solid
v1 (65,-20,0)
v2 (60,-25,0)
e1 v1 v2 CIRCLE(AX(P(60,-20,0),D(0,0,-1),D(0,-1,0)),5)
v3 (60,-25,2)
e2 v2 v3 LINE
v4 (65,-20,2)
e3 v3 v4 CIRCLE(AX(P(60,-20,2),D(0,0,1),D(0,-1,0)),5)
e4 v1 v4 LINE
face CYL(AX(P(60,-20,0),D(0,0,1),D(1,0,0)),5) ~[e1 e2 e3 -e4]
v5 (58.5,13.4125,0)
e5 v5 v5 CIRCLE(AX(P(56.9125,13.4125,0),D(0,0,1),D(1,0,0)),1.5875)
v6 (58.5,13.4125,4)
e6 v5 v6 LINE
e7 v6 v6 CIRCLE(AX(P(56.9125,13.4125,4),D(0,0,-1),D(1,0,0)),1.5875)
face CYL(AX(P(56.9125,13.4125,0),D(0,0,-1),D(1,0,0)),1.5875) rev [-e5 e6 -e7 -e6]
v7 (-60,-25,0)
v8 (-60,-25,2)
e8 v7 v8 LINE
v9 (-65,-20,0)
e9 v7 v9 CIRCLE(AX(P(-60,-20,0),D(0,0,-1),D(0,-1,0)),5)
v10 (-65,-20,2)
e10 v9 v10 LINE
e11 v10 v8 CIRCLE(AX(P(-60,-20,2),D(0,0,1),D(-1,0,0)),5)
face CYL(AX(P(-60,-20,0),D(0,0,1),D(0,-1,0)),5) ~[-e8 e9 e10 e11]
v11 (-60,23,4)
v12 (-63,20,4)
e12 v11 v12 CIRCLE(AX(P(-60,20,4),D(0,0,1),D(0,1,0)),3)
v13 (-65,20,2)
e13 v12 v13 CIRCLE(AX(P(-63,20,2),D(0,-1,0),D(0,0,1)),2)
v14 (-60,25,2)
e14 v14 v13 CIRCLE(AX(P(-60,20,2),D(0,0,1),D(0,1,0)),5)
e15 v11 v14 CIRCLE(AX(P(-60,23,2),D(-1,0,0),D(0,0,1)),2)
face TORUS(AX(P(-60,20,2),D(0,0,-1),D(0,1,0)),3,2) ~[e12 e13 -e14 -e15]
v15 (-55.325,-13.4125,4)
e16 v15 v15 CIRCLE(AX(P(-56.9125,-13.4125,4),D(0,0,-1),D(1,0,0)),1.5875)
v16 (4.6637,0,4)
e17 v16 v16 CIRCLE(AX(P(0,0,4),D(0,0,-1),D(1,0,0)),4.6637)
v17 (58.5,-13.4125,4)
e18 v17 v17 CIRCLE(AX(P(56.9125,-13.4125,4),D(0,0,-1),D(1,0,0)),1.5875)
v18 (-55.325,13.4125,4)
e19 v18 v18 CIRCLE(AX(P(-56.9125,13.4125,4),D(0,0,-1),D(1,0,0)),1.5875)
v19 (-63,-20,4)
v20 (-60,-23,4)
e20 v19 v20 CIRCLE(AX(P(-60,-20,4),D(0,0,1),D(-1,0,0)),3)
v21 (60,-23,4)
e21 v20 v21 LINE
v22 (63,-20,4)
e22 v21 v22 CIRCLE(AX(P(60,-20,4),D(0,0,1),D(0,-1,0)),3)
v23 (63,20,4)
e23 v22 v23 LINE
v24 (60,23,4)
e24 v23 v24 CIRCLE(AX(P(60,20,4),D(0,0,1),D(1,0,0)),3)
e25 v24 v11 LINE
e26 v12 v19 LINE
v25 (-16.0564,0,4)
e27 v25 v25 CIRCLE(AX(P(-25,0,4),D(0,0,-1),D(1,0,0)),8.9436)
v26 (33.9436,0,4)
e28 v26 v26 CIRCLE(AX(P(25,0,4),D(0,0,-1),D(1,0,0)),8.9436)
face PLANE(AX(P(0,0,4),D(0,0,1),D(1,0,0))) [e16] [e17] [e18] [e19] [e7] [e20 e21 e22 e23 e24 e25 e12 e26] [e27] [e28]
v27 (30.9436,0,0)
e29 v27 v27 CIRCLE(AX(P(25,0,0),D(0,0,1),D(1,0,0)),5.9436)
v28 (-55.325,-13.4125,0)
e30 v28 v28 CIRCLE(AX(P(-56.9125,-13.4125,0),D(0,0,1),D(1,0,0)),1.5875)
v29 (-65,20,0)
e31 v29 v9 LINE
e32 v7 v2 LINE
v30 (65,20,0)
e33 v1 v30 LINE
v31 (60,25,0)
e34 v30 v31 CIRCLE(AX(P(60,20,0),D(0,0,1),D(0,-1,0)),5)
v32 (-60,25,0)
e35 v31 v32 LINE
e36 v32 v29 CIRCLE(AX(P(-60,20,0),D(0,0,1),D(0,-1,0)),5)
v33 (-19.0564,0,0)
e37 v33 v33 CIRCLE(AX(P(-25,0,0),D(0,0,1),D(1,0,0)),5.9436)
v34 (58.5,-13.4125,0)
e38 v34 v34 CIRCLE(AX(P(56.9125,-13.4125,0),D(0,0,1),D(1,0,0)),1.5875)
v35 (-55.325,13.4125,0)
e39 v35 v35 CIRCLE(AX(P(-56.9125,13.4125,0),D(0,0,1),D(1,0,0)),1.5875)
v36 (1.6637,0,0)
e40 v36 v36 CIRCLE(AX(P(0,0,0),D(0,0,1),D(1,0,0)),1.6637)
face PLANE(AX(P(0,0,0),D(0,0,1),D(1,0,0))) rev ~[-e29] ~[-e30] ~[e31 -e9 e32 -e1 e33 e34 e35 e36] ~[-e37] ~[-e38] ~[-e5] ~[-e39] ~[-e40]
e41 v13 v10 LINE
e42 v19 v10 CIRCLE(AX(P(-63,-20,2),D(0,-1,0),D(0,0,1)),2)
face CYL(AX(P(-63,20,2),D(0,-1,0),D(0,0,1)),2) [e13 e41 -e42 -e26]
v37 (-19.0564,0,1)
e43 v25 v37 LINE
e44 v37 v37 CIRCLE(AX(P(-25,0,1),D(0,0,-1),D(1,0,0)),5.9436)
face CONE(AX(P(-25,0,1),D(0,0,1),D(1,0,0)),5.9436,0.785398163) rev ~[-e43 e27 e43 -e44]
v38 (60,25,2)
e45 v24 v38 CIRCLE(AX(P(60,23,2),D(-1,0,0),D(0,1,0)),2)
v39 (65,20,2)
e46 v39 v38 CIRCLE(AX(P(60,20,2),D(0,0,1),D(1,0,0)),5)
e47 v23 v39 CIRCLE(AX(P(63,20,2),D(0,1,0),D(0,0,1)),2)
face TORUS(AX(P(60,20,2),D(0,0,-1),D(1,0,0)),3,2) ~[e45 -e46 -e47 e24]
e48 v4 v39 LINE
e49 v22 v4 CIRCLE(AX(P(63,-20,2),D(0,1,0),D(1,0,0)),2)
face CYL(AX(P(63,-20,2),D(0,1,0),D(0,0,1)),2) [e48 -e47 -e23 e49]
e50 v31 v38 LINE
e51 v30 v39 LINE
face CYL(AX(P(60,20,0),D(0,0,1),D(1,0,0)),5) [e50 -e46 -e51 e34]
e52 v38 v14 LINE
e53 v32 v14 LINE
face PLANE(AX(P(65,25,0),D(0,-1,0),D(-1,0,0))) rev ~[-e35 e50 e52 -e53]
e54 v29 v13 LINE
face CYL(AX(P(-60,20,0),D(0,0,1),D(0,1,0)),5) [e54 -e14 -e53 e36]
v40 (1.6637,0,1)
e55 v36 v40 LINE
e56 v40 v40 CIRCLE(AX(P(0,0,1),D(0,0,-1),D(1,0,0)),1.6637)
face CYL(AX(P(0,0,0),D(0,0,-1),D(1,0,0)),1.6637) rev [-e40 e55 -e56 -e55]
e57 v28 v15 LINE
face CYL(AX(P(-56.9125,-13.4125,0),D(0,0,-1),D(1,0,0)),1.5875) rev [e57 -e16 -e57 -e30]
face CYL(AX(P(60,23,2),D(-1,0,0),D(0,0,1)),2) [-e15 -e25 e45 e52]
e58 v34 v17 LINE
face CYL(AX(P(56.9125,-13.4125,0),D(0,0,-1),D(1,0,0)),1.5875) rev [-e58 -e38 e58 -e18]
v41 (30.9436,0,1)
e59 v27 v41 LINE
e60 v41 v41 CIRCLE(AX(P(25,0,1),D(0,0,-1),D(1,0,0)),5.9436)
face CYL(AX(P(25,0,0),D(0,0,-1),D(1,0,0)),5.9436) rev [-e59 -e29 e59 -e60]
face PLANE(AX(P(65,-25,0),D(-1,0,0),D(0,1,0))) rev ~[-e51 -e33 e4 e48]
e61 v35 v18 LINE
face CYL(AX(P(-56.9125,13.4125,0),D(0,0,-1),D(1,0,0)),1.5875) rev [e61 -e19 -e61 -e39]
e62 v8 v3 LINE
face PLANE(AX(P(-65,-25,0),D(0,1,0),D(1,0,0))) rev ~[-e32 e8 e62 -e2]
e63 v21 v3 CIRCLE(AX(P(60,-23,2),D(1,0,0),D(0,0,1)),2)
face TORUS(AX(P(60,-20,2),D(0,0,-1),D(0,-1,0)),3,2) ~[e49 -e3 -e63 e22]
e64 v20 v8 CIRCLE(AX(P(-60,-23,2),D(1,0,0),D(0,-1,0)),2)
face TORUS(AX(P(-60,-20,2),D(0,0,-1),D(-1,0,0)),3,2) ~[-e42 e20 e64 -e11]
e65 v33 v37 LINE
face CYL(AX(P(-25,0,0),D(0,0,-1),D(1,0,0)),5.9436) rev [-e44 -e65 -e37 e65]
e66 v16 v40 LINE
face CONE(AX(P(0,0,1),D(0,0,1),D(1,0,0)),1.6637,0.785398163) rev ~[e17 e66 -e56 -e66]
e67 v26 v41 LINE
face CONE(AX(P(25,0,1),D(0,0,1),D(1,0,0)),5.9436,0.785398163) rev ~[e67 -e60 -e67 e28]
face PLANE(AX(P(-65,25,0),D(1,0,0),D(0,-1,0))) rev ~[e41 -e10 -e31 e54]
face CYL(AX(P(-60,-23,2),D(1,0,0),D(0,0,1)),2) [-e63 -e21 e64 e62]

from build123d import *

# Parameters (mm, degrees)
F1_DEPTH = 4
F2_R     = 5.9436
F2_R_2   = 1.6637
F2_R_3   = 1.5875
F3_DEPTH = 25
F4_R     = 5
F5_R     = 2
F6_SIZE  = 3
F7_SIZE  = 3


# Not quite as in the source:
# - a feature names something its author has since deleted; it is built from what else it names


with BuildPart() as f1:
    # F0 (on Top) → F1 (new body)
    with BuildSketch(Plane.XY):
        Polygon((65, -25), (65, 25), (33, 25), (-33, 25), (-65, 25), (-65, -25), align=None)
    extrude(amount=F1_DEPTH)

    # F2 (on Top) → F3 (cut)
    with BuildSketch(Plane.XY):
        with Locations((-25, 0)):
            Circle(F2_R)
        Circle(F2_R_2)
        with Locations((25, 0)):
            Circle(F2_R)
        with Locations((-56.9125, 13.4125)):
            Circle(F2_R_3)
        with Locations((-56.9125, -13.4125)):
            Circle(F2_R_3)
        with Locations((56.9125, 13.4125)):
            Circle(F2_R_3)
        with Locations((56.9125, -13.4125)):
            Circle(F2_R_3)
    extrude(amount=F3_DEPTH, mode=Mode.SUBTRACT)

    # F4
    f4_edges = [f1.edges().sort_by_distance(p)[0] for p in [
        (-65, -25, 2),
        (65, -25, 2),
        (65, 25, 2),
        (-65, 25, 2),
    ]]
    fillet(f4_edges, radius=F4_R)

    # F5
    f5_edges = [f1.edges().sort_by_distance(p)[0] for p in [
        (-65, 0, 4),
    ]]
    fillet(f5_edges, radius=F5_R)

    # F6
    f6_edges = [f1.edges().sort_by_distance(p)[0] for p in [
        (-30.9436, 0, 4),
        (19.0564, 0, 4),
    ]]
    chamfer(f6_edges, length=F6_SIZE)

    # F7
    f7_edges = [f1.edges().sort_by_distance(p)[0] for p in [
        (-1.6637, 0, 4),
    ]]
    chamfer(f7_edges, length=F7_SIZE)


solid = f1.part
